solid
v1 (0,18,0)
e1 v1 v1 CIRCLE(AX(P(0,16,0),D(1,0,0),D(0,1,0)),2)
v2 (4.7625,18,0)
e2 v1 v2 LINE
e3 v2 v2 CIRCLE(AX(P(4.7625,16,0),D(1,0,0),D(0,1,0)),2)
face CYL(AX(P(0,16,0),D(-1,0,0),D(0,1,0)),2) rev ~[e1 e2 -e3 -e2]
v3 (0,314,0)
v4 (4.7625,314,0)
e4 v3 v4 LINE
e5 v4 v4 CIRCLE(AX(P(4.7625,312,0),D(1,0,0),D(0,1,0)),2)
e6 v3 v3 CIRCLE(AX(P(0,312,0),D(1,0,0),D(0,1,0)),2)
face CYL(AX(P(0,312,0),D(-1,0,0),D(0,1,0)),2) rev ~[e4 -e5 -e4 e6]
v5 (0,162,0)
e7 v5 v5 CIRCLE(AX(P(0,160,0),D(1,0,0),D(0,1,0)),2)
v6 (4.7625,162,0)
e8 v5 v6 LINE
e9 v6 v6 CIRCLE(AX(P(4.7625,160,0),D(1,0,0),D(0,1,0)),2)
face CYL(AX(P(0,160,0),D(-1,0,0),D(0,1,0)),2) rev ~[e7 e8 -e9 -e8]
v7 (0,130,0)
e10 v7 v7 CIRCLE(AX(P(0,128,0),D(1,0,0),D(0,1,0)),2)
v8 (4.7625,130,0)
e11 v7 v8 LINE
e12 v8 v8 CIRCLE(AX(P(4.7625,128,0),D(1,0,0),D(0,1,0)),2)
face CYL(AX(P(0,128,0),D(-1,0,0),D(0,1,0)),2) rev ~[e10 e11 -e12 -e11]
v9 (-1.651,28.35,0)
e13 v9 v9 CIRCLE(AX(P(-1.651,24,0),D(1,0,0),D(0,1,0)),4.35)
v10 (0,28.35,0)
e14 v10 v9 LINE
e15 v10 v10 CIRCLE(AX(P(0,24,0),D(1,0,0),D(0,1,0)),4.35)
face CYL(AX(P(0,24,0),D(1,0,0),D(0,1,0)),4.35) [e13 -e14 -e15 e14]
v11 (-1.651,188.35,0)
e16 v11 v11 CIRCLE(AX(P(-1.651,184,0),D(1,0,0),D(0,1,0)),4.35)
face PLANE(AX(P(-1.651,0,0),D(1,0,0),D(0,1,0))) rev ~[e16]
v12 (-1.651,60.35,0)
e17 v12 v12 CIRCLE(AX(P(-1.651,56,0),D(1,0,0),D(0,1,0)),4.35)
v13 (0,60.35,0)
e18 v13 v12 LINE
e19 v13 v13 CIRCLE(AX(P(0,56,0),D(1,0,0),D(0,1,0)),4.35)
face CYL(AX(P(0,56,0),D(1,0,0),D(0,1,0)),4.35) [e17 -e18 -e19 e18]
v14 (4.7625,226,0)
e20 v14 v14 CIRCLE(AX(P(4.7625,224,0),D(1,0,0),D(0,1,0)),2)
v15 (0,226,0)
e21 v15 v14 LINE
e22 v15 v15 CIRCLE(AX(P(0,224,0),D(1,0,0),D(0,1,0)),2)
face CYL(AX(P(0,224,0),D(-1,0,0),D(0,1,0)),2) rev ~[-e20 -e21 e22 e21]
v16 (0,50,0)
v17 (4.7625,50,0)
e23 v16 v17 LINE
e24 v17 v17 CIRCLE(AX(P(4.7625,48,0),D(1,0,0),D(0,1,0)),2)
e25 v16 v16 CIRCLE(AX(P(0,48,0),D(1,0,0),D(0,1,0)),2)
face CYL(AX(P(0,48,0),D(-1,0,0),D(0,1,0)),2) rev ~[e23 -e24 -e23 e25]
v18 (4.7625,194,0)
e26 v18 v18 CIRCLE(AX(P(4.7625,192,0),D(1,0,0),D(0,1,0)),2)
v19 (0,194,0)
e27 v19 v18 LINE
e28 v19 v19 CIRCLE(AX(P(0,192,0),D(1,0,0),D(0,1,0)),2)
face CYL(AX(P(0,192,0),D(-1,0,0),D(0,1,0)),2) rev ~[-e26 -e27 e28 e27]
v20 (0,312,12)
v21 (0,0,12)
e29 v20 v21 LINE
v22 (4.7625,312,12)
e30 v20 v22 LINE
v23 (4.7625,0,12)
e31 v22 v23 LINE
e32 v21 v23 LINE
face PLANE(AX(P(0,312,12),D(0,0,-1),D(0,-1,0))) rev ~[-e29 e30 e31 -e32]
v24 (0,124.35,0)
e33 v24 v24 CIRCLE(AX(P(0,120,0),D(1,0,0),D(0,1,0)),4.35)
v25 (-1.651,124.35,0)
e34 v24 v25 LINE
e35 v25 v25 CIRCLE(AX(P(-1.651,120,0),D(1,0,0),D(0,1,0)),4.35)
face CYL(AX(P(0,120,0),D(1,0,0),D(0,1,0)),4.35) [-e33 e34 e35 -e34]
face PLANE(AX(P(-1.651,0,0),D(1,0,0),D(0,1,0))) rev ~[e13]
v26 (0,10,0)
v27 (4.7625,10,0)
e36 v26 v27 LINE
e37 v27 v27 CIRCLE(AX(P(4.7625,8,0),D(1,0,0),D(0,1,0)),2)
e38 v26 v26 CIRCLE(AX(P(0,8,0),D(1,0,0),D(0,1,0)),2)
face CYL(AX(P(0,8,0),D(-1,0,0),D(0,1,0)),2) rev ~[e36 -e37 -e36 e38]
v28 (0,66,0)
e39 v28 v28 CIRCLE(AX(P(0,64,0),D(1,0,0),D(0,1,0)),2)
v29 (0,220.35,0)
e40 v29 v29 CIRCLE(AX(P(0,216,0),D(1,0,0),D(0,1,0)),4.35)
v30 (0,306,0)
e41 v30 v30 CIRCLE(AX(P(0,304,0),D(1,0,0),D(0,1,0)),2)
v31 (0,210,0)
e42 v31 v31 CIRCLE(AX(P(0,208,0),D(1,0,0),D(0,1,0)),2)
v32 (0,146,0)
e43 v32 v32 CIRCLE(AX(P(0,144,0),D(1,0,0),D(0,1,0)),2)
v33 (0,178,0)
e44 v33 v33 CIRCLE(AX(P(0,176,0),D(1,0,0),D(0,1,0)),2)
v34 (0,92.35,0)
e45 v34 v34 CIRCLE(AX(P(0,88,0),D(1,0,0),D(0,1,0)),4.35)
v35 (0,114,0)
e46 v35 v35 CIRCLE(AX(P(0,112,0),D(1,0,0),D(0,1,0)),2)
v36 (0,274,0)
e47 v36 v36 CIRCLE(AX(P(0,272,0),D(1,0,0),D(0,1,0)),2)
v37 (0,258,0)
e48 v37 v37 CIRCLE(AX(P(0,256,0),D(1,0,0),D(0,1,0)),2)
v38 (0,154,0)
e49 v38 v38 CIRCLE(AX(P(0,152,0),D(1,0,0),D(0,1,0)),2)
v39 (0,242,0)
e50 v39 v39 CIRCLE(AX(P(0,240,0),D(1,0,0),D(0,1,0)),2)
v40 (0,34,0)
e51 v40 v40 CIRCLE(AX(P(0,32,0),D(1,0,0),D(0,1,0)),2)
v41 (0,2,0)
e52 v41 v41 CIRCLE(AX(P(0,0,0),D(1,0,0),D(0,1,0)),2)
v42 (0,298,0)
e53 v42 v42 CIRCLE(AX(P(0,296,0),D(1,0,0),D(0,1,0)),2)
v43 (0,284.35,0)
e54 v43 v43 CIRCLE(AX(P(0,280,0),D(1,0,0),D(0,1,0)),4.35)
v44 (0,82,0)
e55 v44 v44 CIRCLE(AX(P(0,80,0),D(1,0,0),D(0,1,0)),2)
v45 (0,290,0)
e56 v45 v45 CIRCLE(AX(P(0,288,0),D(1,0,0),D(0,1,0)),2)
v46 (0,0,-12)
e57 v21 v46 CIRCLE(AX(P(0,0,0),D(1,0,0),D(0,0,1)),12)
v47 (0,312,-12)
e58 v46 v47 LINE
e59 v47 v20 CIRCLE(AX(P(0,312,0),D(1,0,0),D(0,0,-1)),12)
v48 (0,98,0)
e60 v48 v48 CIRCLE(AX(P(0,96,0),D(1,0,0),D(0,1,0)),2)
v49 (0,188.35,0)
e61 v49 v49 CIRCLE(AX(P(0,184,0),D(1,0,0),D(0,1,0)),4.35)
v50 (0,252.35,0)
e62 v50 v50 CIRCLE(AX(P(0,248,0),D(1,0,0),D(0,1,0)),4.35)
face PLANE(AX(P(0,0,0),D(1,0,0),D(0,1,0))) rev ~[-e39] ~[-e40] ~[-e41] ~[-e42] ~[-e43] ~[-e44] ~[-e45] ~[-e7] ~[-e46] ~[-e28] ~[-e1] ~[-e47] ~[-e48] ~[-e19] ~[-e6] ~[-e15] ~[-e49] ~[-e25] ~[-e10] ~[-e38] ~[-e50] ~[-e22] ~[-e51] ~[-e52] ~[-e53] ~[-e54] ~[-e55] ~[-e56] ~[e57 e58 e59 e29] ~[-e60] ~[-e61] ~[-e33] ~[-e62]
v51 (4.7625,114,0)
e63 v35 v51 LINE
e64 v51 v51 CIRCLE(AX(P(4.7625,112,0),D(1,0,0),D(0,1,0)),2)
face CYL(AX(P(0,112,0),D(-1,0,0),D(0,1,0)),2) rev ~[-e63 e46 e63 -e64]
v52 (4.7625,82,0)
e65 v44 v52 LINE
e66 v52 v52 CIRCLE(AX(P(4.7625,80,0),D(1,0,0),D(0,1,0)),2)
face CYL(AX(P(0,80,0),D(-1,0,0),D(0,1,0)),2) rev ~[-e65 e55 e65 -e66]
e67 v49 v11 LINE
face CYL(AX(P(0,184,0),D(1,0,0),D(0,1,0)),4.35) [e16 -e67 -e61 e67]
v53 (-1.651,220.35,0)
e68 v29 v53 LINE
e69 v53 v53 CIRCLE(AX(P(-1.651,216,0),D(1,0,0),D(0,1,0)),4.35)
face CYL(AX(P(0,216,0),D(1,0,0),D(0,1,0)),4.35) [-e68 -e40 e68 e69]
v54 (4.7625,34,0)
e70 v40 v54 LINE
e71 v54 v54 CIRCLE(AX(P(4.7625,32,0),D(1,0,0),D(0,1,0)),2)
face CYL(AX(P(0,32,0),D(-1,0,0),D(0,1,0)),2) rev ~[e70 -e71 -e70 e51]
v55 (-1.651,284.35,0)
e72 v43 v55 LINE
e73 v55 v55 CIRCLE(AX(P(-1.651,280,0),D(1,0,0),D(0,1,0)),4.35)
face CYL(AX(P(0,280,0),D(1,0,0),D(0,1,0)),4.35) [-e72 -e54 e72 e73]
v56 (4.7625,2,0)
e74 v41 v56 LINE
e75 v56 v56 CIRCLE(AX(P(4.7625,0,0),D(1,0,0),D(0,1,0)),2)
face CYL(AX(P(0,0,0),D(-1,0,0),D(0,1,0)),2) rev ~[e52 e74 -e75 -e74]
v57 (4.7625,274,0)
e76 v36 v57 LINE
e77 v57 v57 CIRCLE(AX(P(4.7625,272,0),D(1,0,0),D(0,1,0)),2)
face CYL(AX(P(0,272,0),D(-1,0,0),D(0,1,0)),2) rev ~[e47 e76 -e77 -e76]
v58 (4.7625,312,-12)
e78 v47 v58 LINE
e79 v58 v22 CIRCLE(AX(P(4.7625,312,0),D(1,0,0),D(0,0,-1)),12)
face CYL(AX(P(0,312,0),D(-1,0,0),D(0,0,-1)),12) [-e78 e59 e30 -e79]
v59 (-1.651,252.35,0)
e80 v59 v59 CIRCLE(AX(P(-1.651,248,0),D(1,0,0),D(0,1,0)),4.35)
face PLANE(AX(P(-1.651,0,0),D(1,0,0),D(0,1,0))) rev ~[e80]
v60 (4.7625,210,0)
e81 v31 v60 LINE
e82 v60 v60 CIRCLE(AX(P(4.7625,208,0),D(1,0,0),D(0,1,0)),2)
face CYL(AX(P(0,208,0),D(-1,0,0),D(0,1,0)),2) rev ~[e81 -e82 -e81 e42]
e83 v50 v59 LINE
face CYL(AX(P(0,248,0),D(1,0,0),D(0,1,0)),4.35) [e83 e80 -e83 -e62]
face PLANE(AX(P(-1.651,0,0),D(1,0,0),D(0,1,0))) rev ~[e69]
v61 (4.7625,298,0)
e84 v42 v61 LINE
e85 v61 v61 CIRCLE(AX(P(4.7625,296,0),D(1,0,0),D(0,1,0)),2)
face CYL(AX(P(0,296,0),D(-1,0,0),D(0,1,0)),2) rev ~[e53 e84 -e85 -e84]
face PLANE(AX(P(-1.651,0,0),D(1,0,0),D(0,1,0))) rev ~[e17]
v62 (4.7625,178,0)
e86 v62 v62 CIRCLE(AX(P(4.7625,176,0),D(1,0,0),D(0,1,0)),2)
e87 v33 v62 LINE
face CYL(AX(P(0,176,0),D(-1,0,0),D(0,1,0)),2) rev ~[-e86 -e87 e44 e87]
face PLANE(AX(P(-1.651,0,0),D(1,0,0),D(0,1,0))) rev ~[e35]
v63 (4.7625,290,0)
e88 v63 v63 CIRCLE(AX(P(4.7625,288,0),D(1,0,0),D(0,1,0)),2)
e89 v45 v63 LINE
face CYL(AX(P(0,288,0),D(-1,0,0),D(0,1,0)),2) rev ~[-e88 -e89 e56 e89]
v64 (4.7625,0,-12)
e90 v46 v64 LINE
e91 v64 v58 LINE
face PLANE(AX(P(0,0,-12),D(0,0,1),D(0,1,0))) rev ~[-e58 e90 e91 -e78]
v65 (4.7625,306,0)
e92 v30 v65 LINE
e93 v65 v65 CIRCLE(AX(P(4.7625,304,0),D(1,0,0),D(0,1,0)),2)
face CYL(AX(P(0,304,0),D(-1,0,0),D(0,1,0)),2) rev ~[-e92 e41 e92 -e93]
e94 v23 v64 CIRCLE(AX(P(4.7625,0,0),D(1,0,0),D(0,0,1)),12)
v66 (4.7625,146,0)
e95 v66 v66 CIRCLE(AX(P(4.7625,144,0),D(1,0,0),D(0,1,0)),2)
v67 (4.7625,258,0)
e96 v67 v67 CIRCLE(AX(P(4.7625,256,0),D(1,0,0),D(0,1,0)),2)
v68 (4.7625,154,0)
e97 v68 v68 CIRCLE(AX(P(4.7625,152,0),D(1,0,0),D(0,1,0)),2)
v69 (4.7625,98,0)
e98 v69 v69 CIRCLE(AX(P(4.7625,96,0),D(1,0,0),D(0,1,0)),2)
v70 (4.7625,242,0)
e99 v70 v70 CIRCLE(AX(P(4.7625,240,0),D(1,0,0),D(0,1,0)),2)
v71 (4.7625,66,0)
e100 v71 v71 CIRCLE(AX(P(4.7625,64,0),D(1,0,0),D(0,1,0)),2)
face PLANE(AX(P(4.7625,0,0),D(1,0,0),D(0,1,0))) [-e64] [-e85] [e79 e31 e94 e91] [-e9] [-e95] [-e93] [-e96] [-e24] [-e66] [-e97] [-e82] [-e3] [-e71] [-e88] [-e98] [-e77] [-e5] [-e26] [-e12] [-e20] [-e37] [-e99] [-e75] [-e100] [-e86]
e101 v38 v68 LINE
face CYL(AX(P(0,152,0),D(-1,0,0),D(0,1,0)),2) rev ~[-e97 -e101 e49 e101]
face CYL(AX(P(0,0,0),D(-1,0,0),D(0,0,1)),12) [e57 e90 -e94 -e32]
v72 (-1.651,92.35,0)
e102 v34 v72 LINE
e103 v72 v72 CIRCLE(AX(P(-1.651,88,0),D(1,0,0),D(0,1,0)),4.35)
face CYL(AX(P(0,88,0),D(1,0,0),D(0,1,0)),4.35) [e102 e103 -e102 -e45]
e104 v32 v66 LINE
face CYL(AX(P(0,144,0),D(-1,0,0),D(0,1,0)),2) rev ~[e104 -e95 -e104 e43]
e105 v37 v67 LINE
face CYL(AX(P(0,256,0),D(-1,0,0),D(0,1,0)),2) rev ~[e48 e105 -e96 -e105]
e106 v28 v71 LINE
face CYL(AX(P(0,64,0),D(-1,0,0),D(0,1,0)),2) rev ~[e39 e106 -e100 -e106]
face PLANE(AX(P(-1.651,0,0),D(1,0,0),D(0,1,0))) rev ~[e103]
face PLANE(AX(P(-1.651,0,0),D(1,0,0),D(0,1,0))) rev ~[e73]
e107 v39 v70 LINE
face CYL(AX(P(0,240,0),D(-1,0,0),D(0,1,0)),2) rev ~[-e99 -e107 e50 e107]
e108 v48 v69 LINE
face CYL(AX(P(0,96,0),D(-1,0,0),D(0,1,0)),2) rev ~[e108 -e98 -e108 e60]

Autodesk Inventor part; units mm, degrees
ref_plane "YZ Plane" through (0, 0, 0) normal (1, 0, 0) x (0, 1, 0)
ref_plane "XZ Plane" through (0, 0, 0) normal (0, 1, 0) x (-1, 0, 0)
ref_plane "XY Plane" through (0, 0, 0) normal (0, 0, 1) x (1, 0, 0)
sketch "Sketch1" plane through (0, 0, 0) normal (1, 0, 0) x (0, 1, 0)
  circle A0 centre (144, 0) radius 2
  arc A1 (288, 0) -> (288, 0) centre (288, 0) ccw
  circle A2 centre (288, 0) radius 2
  circle A3 centre (0, 0) radius 2
  line L0 (0, 0) -> (288, 0) construction
  line L1 (0, 0) -> (288, 0) construction
  line L2 (0, -12) -> (312, -12)
  line L3 (312, 12) -> (0, 12)
  arc A4 (0, 12) -> (0, -12) centre (0, 0) ccw
  circle A5 centre (9.7, 100) radius 1.6
  circle A6 centre (9.7, 108) radius 4.5
  circle A7 centre (9.7, 116) radius 1.6
  circle A8 centre (9.7, 124) radius 4.5
  circle A9 centre (144, 0) radius 4.5
  circle A10 centre (8, 0) radius 4.35
  circle A11 centre (16, 0) radius 2
  circle A12 centre (24, 0) radius 4.35
  circle A13 centre (32, 0) radius 2
  circle A14 centre (40, 0) radius 4.35
  circle A15 centre (48, 0) radius 2
  circle A16 centre (56, 0) radius 4.35
  circle A17 centre (64, 0) radius 2
  circle A18 centre (72, 0) radius 4.35
  circle A19 centre (80, 0) radius 2
  circle A20 centre (88, 0) radius 4.35
  circle A21 centre (96, 0) radius 2
  circle A22 centre (104, 0) radius 4.35
  circle A23 centre (112, 0) radius 2
  circle A24 centre (120, 0) radius 4.35
  circle A25 centre (128, 0) radius 2
  circle A26 centre (136, 0) radius 4.35
  circle A27 centre (144, 0) radius 2
  circle A28 centre (152, 0) radius 4.35
  circle A29 centre (160, 0) radius 2
  circle A30 centre (168, 0) radius 4.35
  circle A31 centre (176, 0) radius 2
  circle A32 centre (184, 0) radius 4.35
  circle A33 centre (192, 0) radius 2
  circle A34 centre (200, 0) radius 4.35
  circle A35 centre (208, 0) radius 2
  circle A36 centre (216, 0) radius 4.35
  circle A37 centre (224, 0) radius 2
  circle A38 centre (232, 0) radius 4.35
  circle A39 centre (240, 0) radius 2
  circle A40 centre (248, 0) radius 4.35
  circle A41 centre (256, 0) radius 2
  circle A42 centre (264, 0) radius 4.35
  circle A43 centre (272, 0) radius 2
  circle A44 centre (280, 0) radius 4.35
  circle A45 centre (288, 0) radius 2
  circle A46 centre (296, 0) radius 4.35
  circle A47 centre (296, 0) radius 2
  circle A48 centre (304, 0) radius 2
  circle A49 centre (312, 0) radius 2
  arc A50 (312, -12) -> (312, 12) centre (312, 0) ccw
  circle A51 centre (8, 0) radius 2
  circle A52 centre (152, 0) radius 2
  point P0 (148.082969, -1.891921)
  point P1 (139.917031, -1.891921)
  point P2 (139.917031, 1.891921)
  point P3 (148.082969, 1.891921)
  dimension "d0" = 4
  dimension "d1" = 4
  dimension "d2" = 144
  dimension "d3" = 4
  dimension "d4" = 144
  dimension "d6" = 3.2
  dimension "d7" = 9
  dimension "d8" = 8
  dimension "d9" = 8
  dimension "d10" = 8
  dimension "d11" = 9
  dimension "d12" = 8.7
  dimension "d13" = 8
  dimension "d16" = 16
  dimension "d27" = 8
  dimension "d32" = 24
  dimension "d33" = 4
  dimension "d34" = 4
sketch "Sketch1 outline for Extrusion1" plane through (0, 0, 0) normal (1, 0, 0) x (0, 1, 0)
  line L0 (0, -12) -> (312, -12)
  arc A0 (312, -12) -> (312, 12) centre (312, 0) ccw
  line L1 (312, 12) -> (0, 12)
  arc A1 (0, 12) -> (0, -12) centre (0, 0) ccw
  circle A2 centre (0, 0) radius 2
  circle A3 centre (16, 0) radius 2
  circle A4 centre (32, 0) radius 2
  circle A5 centre (48, 0) radius 2
  circle A6 centre (64, 0) radius 2
  circle A7 centre (80, 0) radius 2
  circle A8 centre (96, 0) radius 2
  circle A9 centre (112, 0) radius 2
  circle A10 centre (128, 0) radius 2
  circle A11 centre (160, 0) radius 2
  circle A12 centre (176, 0) radius 2
  circle A13 centre (192, 0) radius 2
  circle A14 centre (208, 0) radius 2
  circle A15 centre (224, 0) radius 2
  circle A16 centre (240, 0) radius 2
  circle A17 centre (256, 0) radius 2
  circle A18 centre (272, 0) radius 2
  circle A19 centre (288, 0) radius 2
  circle A20 centre (296, 0) radius 2
  circle A21 centre (304, 0) radius 2
  circle A22 centre (312, 0) radius 2
  circle A23 centre (8, 0) radius 2
  circle A24 centre (152, 0) radius 2
  circle A25 centre (144, 0) radius 2
extrude "Extrusion1" add sketch "Sketch1 outline for Extrusion1" along normal blind 4.7625
sketch "Sketch1 outline for Extrusion2" plane through (0, 0, 0) normal (1, 0, 0) x (0, 1, 0)
  circle A0 centre (24, 0) radius 4.35
  circle A1 centre (56, 0) radius 4.35
  circle A2 centre (88, 0) radius 4.35
  circle A3 centre (120, 0) radius 4.35
  circle A4 centre (184, 0) radius 4.35
  circle A5 centre (216, 0) radius 4.35
  circle A6 centre (248, 0) radius 4.35
  circle A7 centre (280, 0) radius 4.35
extrude "Extrusion2" add sketch "Sketch1 outline for Extrusion2" against normal blind 1.651 from surface at 0
equation "\"d4\" = d2"
properties part number "Intake Mounting Bracket"
